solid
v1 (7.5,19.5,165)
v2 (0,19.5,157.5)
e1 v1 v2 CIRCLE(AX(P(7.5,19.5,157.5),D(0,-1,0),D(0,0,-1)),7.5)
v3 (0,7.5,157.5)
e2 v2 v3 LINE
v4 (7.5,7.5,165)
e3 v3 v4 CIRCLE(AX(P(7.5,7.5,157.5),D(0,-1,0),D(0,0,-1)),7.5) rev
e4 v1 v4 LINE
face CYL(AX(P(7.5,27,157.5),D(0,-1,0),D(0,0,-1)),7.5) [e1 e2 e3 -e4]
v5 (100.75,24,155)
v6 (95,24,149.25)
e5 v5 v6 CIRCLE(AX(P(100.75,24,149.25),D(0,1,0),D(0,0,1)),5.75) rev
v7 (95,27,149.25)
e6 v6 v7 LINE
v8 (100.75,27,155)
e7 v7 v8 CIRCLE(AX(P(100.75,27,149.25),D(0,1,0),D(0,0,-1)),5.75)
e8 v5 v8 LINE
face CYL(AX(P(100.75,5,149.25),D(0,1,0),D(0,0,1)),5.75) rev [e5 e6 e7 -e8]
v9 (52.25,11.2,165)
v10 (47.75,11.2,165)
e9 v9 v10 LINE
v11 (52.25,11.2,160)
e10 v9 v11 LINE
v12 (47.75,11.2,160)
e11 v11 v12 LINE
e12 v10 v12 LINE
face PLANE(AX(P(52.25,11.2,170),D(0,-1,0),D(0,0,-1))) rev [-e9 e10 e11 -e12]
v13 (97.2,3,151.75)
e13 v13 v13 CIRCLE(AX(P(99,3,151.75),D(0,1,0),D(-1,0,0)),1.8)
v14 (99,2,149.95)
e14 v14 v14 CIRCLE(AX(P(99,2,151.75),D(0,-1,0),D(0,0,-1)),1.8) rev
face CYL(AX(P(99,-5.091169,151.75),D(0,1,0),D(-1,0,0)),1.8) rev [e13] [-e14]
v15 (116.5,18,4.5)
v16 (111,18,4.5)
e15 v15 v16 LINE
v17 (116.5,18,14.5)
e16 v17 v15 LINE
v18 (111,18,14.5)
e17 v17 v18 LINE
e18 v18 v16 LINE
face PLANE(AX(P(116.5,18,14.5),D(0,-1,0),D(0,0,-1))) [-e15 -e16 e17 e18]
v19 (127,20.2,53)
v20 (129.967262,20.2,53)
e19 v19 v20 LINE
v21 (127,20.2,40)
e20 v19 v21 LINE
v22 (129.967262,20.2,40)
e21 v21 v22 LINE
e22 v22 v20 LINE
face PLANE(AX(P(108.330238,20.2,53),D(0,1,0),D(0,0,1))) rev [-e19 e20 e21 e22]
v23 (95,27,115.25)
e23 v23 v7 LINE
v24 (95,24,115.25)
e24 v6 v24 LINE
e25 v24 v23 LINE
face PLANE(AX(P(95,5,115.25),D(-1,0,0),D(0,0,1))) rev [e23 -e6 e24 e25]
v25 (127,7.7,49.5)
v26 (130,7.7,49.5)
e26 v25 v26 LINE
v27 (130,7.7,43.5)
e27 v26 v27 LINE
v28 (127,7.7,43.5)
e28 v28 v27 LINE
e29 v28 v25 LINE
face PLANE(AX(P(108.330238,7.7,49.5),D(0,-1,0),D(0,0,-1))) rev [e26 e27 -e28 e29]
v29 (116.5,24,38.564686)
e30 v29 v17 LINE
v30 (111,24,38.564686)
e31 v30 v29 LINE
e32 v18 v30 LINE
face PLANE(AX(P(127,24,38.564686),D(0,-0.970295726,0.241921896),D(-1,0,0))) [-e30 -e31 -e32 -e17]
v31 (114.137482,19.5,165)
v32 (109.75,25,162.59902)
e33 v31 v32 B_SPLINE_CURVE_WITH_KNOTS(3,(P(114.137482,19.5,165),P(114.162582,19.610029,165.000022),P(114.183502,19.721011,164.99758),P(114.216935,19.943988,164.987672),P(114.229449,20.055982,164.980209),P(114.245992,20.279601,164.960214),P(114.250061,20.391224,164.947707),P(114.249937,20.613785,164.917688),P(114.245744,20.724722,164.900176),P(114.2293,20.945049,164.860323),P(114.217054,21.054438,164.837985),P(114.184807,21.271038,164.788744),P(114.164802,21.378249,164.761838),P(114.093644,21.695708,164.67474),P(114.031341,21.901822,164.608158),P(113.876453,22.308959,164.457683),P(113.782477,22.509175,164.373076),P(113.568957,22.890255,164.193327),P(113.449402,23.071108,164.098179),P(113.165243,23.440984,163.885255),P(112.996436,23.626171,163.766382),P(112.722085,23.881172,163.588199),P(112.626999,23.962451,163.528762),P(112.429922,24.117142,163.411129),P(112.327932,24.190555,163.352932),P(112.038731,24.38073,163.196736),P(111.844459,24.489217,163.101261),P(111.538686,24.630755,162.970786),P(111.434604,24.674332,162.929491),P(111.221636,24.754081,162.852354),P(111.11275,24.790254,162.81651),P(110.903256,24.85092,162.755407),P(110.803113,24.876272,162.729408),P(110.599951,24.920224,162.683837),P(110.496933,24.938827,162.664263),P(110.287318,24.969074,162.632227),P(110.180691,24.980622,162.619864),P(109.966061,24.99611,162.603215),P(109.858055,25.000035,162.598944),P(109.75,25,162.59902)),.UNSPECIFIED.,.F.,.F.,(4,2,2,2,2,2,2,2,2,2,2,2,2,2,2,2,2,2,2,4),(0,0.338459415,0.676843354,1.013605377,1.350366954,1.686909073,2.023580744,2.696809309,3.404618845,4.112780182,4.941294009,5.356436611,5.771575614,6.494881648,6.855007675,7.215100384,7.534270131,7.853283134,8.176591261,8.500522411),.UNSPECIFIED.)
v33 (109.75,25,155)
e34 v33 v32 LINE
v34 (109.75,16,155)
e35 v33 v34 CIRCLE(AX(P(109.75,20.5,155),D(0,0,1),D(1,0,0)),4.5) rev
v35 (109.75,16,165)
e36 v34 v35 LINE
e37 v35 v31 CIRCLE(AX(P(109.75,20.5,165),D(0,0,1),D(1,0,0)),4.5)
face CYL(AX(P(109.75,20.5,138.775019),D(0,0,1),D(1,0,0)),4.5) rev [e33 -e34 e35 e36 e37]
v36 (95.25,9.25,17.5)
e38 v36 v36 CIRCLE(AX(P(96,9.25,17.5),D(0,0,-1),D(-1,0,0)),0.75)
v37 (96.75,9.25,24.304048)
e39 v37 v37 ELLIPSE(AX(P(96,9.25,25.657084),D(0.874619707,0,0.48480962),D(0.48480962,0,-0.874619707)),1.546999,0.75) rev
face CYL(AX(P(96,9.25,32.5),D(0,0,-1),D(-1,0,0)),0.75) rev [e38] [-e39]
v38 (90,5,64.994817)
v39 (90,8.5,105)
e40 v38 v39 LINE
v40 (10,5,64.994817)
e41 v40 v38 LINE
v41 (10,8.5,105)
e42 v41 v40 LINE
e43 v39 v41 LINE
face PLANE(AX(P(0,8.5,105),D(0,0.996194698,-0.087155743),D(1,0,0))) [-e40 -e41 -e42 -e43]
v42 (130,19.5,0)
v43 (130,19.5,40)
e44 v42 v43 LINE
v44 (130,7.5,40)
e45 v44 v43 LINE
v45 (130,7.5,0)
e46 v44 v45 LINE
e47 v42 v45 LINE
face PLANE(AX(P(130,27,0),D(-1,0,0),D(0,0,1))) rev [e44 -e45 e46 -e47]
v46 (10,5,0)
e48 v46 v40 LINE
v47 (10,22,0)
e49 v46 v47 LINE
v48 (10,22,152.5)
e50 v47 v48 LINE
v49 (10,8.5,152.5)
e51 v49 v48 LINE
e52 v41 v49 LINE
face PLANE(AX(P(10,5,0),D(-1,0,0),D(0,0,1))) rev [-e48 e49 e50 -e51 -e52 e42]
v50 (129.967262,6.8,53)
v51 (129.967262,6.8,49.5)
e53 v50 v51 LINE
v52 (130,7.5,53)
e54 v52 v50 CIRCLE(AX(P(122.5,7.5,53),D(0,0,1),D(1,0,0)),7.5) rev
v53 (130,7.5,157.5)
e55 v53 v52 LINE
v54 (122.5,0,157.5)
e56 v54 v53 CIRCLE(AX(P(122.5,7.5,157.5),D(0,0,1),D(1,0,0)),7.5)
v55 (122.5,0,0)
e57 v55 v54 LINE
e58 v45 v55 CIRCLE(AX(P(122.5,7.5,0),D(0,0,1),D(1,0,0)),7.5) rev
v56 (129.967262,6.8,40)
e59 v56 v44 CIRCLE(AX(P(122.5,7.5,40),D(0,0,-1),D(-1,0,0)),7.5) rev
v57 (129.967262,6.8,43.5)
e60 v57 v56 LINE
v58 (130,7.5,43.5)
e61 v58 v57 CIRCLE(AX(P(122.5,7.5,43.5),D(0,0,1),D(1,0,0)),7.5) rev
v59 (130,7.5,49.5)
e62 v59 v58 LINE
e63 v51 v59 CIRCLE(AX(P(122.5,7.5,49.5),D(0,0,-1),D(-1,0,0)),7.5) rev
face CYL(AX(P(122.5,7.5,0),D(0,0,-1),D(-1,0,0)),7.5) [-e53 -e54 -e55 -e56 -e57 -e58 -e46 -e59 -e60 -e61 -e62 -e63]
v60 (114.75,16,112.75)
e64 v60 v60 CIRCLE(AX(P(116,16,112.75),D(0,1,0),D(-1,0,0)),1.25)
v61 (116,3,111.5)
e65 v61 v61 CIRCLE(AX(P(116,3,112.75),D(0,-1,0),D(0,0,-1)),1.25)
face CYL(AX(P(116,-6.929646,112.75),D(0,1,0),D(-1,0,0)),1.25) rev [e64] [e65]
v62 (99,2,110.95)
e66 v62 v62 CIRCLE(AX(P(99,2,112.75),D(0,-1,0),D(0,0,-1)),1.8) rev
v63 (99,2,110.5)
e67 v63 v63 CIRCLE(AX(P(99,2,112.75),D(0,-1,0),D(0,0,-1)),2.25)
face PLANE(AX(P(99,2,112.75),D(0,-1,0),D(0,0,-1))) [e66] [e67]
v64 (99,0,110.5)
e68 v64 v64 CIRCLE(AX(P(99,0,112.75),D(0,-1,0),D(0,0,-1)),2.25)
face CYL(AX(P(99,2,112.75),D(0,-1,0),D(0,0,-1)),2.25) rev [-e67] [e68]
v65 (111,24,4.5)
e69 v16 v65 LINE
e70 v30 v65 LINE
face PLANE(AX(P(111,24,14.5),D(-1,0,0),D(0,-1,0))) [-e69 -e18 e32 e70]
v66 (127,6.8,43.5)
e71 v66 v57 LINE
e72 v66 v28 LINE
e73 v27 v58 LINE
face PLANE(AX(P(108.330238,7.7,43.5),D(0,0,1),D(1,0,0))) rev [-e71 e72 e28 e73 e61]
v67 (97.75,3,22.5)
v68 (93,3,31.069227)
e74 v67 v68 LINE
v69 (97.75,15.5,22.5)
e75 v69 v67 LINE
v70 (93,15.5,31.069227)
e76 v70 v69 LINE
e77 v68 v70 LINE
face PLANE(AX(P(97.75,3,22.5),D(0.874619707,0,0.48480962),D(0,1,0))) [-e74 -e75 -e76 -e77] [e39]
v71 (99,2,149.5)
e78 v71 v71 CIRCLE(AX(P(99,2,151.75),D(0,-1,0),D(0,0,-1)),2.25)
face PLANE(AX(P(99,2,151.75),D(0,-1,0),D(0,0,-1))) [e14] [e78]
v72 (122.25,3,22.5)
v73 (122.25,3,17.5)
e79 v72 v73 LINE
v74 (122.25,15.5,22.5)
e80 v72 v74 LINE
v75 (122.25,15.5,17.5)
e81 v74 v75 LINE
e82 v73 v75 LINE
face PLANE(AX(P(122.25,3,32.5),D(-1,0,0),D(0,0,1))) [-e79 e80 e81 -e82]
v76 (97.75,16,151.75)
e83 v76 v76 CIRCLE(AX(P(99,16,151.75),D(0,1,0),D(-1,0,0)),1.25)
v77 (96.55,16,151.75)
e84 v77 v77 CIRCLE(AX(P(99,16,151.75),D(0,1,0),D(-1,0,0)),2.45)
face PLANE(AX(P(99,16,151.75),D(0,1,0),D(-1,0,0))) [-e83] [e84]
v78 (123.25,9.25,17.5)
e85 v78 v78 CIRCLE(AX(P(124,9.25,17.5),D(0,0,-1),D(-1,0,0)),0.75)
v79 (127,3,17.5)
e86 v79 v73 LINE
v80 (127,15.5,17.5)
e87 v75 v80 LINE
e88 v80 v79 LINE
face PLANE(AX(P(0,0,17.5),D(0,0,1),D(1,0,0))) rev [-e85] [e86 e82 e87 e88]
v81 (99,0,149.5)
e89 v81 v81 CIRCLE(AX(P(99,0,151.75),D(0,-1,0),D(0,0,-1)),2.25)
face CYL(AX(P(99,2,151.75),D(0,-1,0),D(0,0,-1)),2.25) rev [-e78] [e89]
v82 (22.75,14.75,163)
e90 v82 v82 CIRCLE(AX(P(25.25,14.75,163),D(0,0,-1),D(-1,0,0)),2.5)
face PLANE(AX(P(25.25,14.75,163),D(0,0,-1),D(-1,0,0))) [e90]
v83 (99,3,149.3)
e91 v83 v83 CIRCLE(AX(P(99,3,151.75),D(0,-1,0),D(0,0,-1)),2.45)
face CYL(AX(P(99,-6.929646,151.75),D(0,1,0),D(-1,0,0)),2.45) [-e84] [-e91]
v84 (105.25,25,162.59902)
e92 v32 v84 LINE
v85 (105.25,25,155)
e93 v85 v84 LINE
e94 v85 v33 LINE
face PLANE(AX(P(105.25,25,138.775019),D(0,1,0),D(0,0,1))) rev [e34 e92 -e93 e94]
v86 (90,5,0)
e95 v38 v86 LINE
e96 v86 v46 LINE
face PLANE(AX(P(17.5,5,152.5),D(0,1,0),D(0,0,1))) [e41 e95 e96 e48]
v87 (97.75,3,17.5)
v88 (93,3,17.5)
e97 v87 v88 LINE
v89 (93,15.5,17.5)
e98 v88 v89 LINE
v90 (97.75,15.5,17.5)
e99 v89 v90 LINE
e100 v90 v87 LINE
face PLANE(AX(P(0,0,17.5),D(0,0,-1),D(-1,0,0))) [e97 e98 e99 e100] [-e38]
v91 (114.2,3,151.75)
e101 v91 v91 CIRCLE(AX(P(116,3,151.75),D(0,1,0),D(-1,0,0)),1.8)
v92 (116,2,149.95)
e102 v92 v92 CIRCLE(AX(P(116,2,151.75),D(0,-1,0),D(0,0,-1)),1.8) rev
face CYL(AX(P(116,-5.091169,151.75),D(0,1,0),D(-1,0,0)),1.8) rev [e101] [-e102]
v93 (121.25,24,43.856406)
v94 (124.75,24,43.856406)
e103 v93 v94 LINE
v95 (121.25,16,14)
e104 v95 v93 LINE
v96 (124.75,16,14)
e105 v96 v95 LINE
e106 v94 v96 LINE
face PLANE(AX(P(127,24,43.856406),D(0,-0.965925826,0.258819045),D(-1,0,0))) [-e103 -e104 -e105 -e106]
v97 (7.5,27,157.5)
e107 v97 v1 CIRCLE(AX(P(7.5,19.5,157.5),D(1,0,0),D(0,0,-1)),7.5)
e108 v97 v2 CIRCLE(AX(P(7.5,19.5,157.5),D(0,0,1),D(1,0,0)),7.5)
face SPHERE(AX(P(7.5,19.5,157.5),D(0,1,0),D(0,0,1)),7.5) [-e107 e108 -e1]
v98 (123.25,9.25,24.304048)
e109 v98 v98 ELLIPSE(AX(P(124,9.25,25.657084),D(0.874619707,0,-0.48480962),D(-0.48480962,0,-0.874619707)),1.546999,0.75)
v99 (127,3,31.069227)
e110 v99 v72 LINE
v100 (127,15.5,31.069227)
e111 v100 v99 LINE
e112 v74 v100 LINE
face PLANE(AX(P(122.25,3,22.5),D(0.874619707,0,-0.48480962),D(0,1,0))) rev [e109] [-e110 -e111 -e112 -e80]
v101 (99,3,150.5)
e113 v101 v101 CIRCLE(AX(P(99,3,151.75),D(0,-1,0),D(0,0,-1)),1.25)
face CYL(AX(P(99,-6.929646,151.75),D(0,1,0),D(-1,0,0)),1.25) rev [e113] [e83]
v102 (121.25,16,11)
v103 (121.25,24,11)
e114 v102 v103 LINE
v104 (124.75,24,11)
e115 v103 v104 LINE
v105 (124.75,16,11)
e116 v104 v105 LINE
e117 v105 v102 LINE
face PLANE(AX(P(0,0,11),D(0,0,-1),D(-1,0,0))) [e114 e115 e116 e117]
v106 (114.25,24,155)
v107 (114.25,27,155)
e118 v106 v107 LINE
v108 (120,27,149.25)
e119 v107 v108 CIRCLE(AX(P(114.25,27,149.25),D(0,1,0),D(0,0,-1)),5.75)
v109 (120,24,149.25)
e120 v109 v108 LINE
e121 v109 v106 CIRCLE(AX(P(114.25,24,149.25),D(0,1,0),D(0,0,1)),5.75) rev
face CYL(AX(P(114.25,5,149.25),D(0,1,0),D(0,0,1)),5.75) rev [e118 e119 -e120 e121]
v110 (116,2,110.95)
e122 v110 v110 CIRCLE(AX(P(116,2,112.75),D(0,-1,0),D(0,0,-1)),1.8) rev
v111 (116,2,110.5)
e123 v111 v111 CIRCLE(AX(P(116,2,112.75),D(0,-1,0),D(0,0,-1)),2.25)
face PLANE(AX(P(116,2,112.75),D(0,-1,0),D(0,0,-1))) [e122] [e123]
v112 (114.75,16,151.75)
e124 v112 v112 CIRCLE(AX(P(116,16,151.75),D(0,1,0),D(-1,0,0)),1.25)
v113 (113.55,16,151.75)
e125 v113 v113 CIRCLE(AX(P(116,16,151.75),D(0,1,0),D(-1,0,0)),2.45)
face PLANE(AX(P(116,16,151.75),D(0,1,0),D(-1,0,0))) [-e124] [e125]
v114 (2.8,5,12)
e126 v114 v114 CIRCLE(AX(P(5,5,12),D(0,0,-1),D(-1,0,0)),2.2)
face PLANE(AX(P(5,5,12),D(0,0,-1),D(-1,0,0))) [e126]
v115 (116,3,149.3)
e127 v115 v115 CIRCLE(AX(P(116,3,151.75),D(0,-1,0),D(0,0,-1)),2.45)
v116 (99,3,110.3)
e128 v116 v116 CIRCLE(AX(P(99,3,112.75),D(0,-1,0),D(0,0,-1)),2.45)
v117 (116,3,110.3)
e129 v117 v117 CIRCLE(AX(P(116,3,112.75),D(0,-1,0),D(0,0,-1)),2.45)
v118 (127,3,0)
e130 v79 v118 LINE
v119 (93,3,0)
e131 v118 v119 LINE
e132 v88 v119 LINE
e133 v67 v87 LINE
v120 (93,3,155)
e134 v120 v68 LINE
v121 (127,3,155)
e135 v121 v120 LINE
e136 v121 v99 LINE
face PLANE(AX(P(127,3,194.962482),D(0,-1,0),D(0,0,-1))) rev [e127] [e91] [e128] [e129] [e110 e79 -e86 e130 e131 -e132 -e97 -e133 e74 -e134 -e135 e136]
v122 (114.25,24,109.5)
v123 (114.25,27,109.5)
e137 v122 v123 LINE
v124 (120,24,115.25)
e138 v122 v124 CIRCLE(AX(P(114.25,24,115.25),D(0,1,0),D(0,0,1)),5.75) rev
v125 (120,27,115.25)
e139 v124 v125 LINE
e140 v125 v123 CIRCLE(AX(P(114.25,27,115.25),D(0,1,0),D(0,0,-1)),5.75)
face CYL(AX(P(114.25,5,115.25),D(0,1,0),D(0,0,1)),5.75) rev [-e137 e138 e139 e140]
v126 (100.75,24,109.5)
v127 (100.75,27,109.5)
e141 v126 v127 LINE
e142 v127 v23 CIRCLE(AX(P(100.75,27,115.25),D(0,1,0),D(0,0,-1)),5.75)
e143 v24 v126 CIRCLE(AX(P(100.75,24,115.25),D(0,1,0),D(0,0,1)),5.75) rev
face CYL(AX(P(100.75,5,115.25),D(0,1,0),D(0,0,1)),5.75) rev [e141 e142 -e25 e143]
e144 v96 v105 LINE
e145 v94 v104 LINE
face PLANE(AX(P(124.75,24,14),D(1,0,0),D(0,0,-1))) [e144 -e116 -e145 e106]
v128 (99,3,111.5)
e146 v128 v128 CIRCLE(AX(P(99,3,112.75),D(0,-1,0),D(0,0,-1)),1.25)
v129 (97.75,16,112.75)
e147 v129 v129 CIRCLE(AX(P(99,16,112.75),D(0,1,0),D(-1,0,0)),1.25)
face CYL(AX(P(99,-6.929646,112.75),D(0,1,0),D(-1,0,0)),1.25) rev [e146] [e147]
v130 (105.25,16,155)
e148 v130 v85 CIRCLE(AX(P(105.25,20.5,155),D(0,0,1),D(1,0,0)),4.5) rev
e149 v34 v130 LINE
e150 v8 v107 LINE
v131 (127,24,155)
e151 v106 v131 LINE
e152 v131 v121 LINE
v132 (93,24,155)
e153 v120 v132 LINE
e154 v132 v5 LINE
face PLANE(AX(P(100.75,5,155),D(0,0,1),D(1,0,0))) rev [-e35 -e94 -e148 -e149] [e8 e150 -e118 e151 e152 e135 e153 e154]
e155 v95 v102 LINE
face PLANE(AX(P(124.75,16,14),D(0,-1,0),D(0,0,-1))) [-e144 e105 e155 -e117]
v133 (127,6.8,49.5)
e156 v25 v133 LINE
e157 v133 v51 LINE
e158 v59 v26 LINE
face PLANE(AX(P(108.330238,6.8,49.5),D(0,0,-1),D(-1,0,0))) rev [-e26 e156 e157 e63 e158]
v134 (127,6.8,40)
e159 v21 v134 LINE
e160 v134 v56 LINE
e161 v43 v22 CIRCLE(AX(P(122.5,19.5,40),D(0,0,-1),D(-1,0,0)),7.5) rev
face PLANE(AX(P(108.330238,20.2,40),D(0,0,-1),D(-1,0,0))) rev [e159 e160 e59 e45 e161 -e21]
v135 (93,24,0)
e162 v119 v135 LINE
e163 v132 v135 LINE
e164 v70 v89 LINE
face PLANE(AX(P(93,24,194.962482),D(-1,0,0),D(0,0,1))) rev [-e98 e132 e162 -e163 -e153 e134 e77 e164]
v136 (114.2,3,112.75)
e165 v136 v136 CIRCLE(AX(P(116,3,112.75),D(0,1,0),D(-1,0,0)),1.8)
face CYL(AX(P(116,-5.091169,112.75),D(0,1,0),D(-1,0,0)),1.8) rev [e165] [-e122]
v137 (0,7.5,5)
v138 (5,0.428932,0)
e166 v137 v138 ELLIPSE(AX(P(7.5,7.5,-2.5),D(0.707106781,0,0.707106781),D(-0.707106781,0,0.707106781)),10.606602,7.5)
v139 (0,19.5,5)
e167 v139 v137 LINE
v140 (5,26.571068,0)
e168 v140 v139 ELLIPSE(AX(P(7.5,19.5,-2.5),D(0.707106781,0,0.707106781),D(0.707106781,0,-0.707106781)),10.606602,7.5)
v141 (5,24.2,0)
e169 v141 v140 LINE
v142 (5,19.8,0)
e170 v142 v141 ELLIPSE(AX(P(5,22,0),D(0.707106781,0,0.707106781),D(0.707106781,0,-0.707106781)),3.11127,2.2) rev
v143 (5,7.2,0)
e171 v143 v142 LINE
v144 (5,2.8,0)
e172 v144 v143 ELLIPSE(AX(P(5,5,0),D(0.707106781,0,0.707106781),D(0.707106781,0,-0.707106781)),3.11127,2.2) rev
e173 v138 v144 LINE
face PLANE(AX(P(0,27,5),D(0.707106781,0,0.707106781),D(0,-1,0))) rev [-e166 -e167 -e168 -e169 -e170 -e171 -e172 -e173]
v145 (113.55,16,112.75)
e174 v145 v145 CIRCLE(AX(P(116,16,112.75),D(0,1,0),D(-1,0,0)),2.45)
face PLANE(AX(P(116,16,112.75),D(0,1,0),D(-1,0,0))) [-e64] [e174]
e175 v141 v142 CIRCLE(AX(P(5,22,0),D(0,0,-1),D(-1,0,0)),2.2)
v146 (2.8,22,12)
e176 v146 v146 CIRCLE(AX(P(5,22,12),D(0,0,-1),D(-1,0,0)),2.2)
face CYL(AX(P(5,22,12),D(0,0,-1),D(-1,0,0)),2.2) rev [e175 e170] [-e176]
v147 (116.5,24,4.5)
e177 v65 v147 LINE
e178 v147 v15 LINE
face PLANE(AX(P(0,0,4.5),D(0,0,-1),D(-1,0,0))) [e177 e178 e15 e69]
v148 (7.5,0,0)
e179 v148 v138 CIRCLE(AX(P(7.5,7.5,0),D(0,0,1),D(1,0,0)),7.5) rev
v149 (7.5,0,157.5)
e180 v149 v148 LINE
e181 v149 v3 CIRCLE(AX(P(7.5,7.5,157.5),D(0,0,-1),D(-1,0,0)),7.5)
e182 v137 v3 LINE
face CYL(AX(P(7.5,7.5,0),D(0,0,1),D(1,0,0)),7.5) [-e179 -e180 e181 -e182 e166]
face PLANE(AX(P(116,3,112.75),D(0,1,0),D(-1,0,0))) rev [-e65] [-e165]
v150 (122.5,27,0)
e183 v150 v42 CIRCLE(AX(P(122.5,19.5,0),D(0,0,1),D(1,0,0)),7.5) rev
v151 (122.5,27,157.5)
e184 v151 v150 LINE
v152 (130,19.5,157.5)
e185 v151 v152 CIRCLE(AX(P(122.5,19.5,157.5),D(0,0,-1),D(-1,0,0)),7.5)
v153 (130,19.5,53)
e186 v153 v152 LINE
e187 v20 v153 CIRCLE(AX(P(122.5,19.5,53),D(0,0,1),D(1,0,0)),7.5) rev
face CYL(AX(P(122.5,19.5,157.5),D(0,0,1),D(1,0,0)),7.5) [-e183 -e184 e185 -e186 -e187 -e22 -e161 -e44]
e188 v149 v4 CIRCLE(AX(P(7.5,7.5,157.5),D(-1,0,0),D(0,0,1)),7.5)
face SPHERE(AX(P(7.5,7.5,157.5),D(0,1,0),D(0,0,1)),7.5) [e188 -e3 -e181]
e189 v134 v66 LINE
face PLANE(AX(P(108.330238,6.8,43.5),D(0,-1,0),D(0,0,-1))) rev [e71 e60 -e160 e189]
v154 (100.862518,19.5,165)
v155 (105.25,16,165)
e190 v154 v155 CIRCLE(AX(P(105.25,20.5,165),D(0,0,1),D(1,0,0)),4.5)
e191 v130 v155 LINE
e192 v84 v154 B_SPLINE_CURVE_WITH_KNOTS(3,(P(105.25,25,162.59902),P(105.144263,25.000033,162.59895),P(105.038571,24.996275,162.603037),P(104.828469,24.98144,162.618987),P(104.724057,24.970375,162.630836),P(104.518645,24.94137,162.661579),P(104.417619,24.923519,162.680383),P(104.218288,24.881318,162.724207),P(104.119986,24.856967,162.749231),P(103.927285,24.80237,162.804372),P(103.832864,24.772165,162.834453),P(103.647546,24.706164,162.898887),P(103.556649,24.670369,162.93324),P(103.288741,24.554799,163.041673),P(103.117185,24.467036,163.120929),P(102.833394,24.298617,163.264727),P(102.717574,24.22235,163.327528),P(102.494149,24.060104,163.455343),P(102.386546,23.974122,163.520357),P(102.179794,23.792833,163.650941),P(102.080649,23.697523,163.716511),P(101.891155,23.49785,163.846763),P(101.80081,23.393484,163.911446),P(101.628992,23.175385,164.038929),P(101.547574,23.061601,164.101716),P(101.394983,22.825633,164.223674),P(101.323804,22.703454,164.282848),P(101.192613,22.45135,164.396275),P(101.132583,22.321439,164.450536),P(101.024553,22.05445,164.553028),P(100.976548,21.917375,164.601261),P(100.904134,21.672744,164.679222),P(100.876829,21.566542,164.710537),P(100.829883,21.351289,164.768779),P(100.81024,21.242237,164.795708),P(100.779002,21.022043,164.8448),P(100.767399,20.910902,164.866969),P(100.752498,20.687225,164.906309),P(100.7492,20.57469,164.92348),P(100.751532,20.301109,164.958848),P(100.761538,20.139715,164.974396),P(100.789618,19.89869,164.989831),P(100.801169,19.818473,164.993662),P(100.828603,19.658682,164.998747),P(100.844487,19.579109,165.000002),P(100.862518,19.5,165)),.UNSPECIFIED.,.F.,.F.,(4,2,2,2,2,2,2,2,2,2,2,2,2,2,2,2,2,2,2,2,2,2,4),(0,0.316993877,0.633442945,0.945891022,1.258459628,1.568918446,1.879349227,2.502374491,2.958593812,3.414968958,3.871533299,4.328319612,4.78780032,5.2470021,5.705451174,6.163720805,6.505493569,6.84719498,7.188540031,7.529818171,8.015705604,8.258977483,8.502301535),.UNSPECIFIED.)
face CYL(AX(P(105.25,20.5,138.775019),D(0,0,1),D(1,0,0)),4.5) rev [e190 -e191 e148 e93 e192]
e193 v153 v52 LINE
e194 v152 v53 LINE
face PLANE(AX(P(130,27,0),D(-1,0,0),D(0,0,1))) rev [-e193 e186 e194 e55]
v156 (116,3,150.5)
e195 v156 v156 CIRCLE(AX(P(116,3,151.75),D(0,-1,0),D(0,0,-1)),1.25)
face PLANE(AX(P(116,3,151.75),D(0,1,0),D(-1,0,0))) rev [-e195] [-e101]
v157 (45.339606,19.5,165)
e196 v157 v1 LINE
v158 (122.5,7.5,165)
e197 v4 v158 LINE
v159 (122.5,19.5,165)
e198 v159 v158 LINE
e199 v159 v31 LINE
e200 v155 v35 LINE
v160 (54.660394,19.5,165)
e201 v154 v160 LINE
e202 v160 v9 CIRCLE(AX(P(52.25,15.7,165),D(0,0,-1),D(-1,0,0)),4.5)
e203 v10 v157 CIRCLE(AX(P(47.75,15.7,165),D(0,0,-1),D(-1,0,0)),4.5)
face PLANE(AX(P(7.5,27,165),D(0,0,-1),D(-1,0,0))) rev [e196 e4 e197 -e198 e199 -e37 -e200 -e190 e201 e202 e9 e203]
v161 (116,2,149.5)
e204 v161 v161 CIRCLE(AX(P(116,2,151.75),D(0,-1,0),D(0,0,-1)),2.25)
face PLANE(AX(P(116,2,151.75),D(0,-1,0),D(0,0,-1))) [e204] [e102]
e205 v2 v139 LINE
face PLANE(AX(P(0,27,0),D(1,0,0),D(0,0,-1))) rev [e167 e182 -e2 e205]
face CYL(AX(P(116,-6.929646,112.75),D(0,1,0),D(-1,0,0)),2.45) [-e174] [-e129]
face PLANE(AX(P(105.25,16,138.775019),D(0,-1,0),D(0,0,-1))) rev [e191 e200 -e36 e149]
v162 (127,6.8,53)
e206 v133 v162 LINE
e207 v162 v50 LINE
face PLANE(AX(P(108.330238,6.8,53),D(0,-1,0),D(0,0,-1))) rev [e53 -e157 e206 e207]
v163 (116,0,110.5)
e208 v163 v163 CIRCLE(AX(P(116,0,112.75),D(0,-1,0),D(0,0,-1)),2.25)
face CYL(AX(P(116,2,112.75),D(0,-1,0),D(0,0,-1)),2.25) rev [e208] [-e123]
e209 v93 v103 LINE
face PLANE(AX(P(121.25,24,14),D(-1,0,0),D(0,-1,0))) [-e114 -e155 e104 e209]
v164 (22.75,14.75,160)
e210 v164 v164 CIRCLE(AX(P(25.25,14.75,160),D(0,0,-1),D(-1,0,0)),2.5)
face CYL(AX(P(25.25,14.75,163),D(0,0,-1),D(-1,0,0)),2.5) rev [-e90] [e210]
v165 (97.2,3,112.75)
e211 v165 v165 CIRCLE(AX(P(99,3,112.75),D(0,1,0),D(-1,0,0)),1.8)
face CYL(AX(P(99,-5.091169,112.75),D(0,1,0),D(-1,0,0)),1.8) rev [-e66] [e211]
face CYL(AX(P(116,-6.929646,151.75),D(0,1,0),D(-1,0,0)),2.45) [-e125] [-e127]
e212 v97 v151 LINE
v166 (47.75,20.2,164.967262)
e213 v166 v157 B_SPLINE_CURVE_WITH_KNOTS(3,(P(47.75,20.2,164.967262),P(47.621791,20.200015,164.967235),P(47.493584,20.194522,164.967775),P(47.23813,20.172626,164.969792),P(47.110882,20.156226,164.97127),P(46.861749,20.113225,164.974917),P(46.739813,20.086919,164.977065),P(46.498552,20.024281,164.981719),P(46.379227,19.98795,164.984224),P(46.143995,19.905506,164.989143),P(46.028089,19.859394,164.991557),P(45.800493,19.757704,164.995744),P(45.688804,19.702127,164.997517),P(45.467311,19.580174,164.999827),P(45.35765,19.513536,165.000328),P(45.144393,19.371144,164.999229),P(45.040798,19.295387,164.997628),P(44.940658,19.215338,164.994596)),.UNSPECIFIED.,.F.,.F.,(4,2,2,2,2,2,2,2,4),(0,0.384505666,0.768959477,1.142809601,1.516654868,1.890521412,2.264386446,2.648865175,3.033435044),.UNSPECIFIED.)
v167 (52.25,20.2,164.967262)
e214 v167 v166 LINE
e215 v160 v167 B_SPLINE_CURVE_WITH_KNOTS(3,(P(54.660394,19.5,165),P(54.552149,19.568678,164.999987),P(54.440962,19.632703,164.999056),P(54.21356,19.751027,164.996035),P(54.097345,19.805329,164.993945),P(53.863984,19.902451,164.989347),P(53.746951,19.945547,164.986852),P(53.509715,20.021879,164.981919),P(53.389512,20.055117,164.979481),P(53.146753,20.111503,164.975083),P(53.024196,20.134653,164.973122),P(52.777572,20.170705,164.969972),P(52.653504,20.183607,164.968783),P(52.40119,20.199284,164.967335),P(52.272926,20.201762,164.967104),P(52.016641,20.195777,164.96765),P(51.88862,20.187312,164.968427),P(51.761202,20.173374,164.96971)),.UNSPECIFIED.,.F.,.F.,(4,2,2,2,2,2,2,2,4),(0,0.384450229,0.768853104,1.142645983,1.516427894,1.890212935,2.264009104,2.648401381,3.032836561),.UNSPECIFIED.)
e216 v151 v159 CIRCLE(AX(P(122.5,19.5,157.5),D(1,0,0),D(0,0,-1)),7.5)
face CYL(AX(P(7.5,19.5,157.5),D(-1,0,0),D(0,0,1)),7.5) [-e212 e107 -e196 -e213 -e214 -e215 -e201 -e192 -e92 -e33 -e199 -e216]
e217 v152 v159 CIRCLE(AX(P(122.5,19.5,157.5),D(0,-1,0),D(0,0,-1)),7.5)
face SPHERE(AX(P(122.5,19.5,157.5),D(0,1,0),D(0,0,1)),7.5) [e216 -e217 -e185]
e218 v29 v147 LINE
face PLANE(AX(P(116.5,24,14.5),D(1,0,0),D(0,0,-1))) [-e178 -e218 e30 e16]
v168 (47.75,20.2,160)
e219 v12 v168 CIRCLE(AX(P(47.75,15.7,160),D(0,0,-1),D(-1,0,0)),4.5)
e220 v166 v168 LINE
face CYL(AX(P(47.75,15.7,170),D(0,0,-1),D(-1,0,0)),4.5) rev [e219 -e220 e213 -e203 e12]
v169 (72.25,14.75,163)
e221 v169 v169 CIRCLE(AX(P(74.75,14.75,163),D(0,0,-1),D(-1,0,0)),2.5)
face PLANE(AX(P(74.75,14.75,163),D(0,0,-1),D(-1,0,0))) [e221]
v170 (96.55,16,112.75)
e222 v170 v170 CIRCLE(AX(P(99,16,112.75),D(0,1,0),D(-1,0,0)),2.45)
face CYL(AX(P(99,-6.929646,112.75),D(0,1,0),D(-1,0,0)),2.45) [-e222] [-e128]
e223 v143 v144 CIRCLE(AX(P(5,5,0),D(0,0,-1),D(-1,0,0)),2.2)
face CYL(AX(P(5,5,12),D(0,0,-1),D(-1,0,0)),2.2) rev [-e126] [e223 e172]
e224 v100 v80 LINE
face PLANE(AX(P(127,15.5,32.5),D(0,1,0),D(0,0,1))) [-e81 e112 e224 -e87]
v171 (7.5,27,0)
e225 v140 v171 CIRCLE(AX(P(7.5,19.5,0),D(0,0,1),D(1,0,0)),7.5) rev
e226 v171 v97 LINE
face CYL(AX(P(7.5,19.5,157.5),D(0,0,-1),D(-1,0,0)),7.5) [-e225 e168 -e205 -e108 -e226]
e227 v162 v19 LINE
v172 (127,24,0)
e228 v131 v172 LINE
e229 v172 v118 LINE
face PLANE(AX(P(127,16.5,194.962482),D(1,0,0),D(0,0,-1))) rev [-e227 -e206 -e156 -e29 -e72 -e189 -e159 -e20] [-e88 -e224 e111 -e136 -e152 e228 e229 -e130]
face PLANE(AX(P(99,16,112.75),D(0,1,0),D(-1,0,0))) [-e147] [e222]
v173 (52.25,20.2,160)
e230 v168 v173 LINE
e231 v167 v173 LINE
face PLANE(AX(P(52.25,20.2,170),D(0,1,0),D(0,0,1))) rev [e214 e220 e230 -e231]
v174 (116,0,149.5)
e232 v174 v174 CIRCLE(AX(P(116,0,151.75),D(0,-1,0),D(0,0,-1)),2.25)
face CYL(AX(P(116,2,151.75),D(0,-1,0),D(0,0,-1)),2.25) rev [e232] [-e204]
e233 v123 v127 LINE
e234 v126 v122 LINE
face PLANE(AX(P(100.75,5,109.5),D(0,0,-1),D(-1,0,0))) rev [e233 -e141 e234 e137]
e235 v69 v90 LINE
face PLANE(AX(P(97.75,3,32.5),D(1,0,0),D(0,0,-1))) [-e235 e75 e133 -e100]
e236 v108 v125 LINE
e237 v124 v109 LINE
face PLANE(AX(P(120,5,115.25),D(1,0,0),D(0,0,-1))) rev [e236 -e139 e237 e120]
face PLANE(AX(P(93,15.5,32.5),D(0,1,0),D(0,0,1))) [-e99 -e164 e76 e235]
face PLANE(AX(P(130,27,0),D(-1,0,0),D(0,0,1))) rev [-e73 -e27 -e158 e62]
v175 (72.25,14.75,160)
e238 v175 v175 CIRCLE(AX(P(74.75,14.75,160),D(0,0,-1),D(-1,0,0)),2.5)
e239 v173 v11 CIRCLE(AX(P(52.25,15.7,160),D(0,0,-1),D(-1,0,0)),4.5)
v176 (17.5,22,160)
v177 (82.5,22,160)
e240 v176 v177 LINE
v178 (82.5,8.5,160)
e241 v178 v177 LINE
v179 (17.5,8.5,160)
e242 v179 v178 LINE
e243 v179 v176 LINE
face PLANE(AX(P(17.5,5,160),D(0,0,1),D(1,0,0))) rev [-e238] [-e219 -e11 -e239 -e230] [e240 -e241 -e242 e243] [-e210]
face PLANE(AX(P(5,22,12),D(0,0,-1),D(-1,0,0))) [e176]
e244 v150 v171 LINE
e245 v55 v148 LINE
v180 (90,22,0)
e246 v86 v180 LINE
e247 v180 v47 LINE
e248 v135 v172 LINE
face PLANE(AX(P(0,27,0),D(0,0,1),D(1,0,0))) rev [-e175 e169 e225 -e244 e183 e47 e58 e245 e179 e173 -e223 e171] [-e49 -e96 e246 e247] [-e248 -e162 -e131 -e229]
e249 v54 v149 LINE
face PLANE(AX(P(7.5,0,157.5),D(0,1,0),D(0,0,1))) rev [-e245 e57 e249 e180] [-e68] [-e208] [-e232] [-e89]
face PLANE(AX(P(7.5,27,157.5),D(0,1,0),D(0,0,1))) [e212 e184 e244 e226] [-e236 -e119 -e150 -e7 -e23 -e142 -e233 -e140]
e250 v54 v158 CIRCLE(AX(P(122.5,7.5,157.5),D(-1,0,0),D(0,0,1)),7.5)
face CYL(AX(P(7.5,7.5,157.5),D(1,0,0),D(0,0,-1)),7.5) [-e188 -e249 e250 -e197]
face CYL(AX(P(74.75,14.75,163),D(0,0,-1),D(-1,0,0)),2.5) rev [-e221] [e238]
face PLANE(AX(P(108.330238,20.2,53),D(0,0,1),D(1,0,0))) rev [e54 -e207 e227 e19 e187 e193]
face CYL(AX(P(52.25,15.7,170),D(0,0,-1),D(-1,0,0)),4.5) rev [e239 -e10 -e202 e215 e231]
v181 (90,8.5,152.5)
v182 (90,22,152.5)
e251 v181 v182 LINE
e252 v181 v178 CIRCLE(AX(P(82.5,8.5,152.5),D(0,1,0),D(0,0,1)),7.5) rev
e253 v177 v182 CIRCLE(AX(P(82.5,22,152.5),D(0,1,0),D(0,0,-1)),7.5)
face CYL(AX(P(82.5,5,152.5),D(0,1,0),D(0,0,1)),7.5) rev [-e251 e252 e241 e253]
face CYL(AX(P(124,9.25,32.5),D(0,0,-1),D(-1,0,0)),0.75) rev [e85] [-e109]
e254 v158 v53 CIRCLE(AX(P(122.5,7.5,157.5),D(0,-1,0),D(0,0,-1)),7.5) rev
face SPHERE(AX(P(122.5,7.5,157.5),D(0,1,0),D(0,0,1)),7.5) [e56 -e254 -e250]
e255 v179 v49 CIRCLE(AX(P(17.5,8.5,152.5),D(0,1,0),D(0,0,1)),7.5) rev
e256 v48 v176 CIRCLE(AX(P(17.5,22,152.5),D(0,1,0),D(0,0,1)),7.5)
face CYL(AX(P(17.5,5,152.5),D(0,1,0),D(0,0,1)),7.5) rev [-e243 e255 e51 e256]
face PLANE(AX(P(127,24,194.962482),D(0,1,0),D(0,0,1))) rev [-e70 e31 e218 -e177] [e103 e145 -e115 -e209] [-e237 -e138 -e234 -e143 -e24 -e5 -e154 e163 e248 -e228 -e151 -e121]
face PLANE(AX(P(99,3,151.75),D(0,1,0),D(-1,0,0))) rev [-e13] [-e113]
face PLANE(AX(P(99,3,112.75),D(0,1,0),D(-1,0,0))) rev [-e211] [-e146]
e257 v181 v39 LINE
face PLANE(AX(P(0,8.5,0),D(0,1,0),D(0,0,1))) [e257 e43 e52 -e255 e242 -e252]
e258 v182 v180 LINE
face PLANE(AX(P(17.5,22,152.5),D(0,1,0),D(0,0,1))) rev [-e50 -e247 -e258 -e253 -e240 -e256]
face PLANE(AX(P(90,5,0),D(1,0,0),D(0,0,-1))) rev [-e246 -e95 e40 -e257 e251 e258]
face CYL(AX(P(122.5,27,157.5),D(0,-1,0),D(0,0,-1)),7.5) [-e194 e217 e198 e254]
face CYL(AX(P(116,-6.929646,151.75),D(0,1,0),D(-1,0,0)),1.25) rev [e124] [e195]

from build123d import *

# Parameters (mm, degrees)
BOSS_EXTRUDE1_DEPTH      = 27
CUT_EXTRUDE1_START       = -5
CUT_EXTRUDE1_DEPTH       = 17
CUT_EXTRUDE2_DEPTH       = 10
FILLET2_R                = 7.5
FILLET3_R                = 7.5
SKETCH4_W                = 80
SKETCH4_H                = 100
BOSS_EXTRUDE2_DEPTH      = 3.5
CHAMFER6_SIZE            = 5
SKETCH6_R                = 2.2
CUT_EXTRUDE3_DEPTH       = 12
CUT_EXTRUDE4_DEPTH       = 22
CUT_EXTRUDE5_REACH       = 213.788
BOSS_EXTRUDE4_DEPTH      = 13
BOSS_EXTRUDE4_DEPTH_BACK = 3
SKETCH12_R               = 2.45
SKETCH12_R_2             = 1.25
SKETCH14_R               = 1.8
CUT_EXTRUDE6_DEPTH       = 3
SKETCH15_R               = 2.25
CUT_EXTRUDE7_DEPTH       = 2
CHAMFER7_SIZE            = 3.936989859
CHAMFER7_SIZE_2          = 45
CUT_EXTRUDE8_DEPTH       = 10
BOSS_EXTRUDE5_START      = -17.5
SKETCH18_W               = 4.75
SKETCH18_H               = 12.5
SKETCH18_R               = 0.75
BOSS_EXTRUDE5_DEPTH      = 15
BOSS_EXTRUDE6_START      = -11
SKETCH19_W               = 3.5
SKETCH19_H               = 8
BOSS_EXTRUDE6_DEPTH      = 3
CHAMFER9_SIZE2           = 8
CHAMFER9_SIZE            = 29.856406461
CHAMFER8_SIZE            = 5.543090515
CHAMFER8_SIZE_2          = 10
BOSS_EXTRUDE7_START      = -4.5
SKETCH20_W               = 5.5
SKETCH20_H               = 6
BOSS_EXTRUDE7_DEPTH      = 10
CHAMFER11_SIZE2          = 6
CHAMFER11_SIZE           = 24.064685601
CUT_EXTRUDE9_DEPTH       = 3
SKETCH22_R               = 2.5
CUT_EXTRUDE10_DEPTH      = 3


# Some blends are built 0.0001 mm under size
with BuildPart() as part:
    # Sketch1 → Boss-Extrude1 (new body)
    with BuildSketch(Plane(origin=(0, 0, 0), x_dir=(1, 0, 0), z_dir=(0, 1, 0))):
        with BuildLine():
            Line((0, 0), (130, 0))
            Line((130, 0), (130, -157.5))
            ThreePointArc((130, -157.5), (127.803300859, -162.803300859), (122.5, -165))
            Line((122.5, -165), (7.5, -165))
            ThreePointArc((7.5, -165), (2.196699141, -162.803300859), (0, -157.5))
            Line((0, -157.5), (0, 0))
        make_face()
    extrude(amount=BOSS_EXTRUDE1_DEPTH)

    # Sketch2 → Cut-Extrude1 (cut)
    with BuildSketch(Plane(origin=(0, 27, 0), x_dir=(1, 0, 0), z_dir=(0, 1, 0)).offset(CUT_EXTRUDE1_START)):
        with BuildLine():
            Line((10, 0), (90, 0))
            Line((90, 0), (90, -152.5))
            ThreePointArc((90, -152.5), (87.803300859, -157.803300859), (82.5, -160))
            Line((82.5, -160), (17.5, -160))
            ThreePointArc((17.5, -160), (12.196699141, -157.803300859), (10, -152.5))
            Line((10, -152.5), (10, 0))
        make_face()
    extrude(amount=-CUT_EXTRUDE1_DEPTH, mode=Mode.SUBTRACT)

    # Sketch3 → Cut-Extrude2 (cut)
    with BuildSketch(Plane(origin=(0, 0, 160), x_dir=(-1, 0, 0), z_dir=(0, 0, -1))):
        with BuildLine():
            Line((-52.25, 20.2), (-47.75, 20.2))
            ThreePointArc((-47.75, 20.2), (-43.25, 15.7), (-47.75, 11.2))
            Line((-47.75, 11.2), (-52.25, 11.2))
            ThreePointArc((-52.25, 11.2), (-56.75, 15.7), (-52.25, 20.2))
        make_face()
    extrude(amount=-CUT_EXTRUDE2_DEPTH, mode=Mode.SUBTRACT)

    # Fillet2
    fillet2_edges = [part.edges().sort_by_distance(p)[0] for p in [
        (130, 0, 78.75),
        (127.803300859, 0, 162.803300859),
        (65, 0, 165),
        (2.196699141, 0, 162.803300859),
        (0, 0, 78.75),
    ]]
    fillet(fillet2_edges, radius=FILLET2_R)

    # Fillet3
    # the kernel refuses this fillet: 7.5 mm, written as the material it takes off along each edge
    with BuildSketch(Plane(origin=(122.5, 27, 165), x_dir=(0, 0, -1), z_dir=(-1, 0, 0))) as fillet3_piece_1:
        with BuildLine():
            CenterArc((FILLET3_R, FILLET3_R), FILLET3_R, 180, 90)
            Line((0, FILLET3_R), (0, 0))
            Line((0, 0), (FILLET3_R, 0))
        make_face()
    extrude(amount=115, mode=Mode.SUBTRACT)
    with BuildSketch(Plane(origin=(130, 27, -18.75), x_dir=(-1, 0, 0), z_dir=(0, 0, 1))) as fillet3_piece_2:
        with BuildLine():
            CenterArc((FILLET3_R, FILLET3_R), FILLET3_R, 180, 90)
            Line((0, FILLET3_R), (0, 0))
            Line((0, 0), (FILLET3_R, 0))
        make_face()
    extrude(amount=176.25, mode=Mode.SUBTRACT)
    with BuildSketch(Plane(origin=(0, 27, 157.5), x_dir=(0, -1, 0), z_dir=(0, 0, -1))) as fillet3_piece_3:
        with BuildLine():
            CenterArc((FILLET3_R, -FILLET3_R), FILLET3_R, 90, 90)
            Line((0, -FILLET3_R), (0, 0))
            Line((0, 0), (FILLET3_R, 0))
        make_face()
    extrude(amount=176.25, mode=Mode.SUBTRACT)
    with BuildSketch(Plane(origin=(122.5, 27, 157.5), x_dir=(1, 0, 0), z_dir=(0, 0, -1))) as fillet3_piece_4:
        with BuildLine():
            CenterArc((7.5 - FILLET3_R, FILLET3_R), FILLET3_R, 270, 90)
            Line((7.5, FILLET3_R), (7.5, 0))
            Line((7.5, 0), (7.5 - FILLET3_R, 0))
        make_face()
    revolve(axis=Axis((122.5, 27, 157.5), (0, -1, 0)), revolution_arc=90, mode=Mode.SUBTRACT)
    with BuildSketch(Plane(origin=(7.5, 27, 157.5), x_dir=(0, 0, 1), z_dir=(1, 0, 0))) as fillet3_piece_5:
        with BuildLine():
            CenterArc((7.5 - FILLET3_R, FILLET3_R), FILLET3_R, 270, 90)
            Line((7.5 - FILLET3_R, 0), (7.5, 0))
            Line((7.5, 0), (7.5, FILLET3_R))
        make_face()
    revolve(axis=Axis((7.5, 27, 157.5), (0, -1, 0)), revolution_arc=90, mode=Mode.SUBTRACT)

    # Sketch4 → Boss-Extrude2 (add)
    with BuildSketch(Plane(origin=(0, 5, 0), x_dir=(1, 0, 0), z_dir=(0, 1, 0))):
        with Locations((50, -110)):
            Rectangle(SKETCH4_W, SKETCH4_H)
    extrude(amount=BOSS_EXTRUDE2_DEPTH)

    # Chamfer6
    # the kernel refuses this chamfer: 5 mm, written as the material it takes off along each edge
    with BuildSketch(Plane(origin=(0, -5.35841494, 0), x_dir=(-0.027495876610586254, 0, 0.9996219169112968), z_dir=(0, 1, 0))) as chamfer6_piece_1:
        Polygon((CHAMFER6_SIZE * 0.999621916911, CHAMFER6_SIZE * 0.0274958766106), (-CHAMFER6_SIZE * 0.0274958766106, CHAMFER6_SIZE * 0.999621916911), (0, 0), align=None)
    extrude(amount=37.71682988, mode=Mode.SUBTRACT)

    # Sketch6 → Cut-Extrude3 (cut)
    with BuildSketch(Plane(origin=(0, 0, 0), x_dir=(-1, 0, 0), z_dir=(0, 0, -1))):
        with Locations((-5, 22)):
            Circle(SKETCH6_R)
        with Locations((-5, 5)):
            Circle(SKETCH6_R)
    extrude(amount=-CUT_EXTRUDE3_DEPTH, mode=Mode.SUBTRACT)

    # Sketch9 → Cut-Extrude4 (cut)
    with BuildSketch(Plane(origin=(0, 27, 0), x_dir=(1, 0, 0), z_dir=(0, 1, 0))):
        with BuildLine():
            Line((100.75, -109.5), (114.25, -109.5))
            ThreePointArc((114.25, -109.5), (118.315863992, -111.184136008), (120, -115.25))
            Line((120, -115.25), (120, -149.25))
            ThreePointArc((120, -149.25), (118.315863992, -153.315863992), (114.25, -155))
            Line((114.25, -155), (100.75, -155))
            ThreePointArc((100.75, -155), (96.684136008, -153.315863992), (95, -149.25))
            Line((95, -149.25), (95, -115.25))
            ThreePointArc((95, -115.25), (96.684136008, -111.184136008), (100.75, -109.5))
        make_face()
    extrude(amount=-CUT_EXTRUDE4_DEPTH, mode=Mode.SUBTRACT)

    # Cut-Extrude5: up to this face of the body (flat: up to its plane)
    cut_extrude5_end = Plane(part.part.faces().sort_by_distance((107.5, 16, 155))[0])
    # Sketch11 → Cut-Extrude5 (cut, up to the picked face)
    with BuildSketch(Plane(origin=(0, 0, 0), x_dir=(-1, 0, 0), z_dir=(0, 0, -1)), mode=Mode.PRIVATE) as cut_extrude5_sk1:
        Polygon((-127, 16.5), (-127, 3), (-93, 3), (-93, 24), (-127, 24), align=None)
    cut_extrude5_tool1 = split(extrude(cut_extrude5_sk1.sketch, amount=-CUT_EXTRUDE5_REACH, mode=Mode.PRIVATE), bisect_by=cut_extrude5_end, keep=Keep.BOTH, mode=Mode.PRIVATE)
    add(cut_extrude5_tool1.solids().sort_by(Axis((110, 13.5, 0), (0, 0, 1)))[0], mode=Mode.SUBTRACT)

    # Sketch12 → Boss-Extrude4 (add, two sides: drawn at the far end of the back side and taken through both)
    # profile 1 of 4: a face of its own
    with BuildSketch(Plane(origin=(0, 3, 0), x_dir=(1, 0, 0), z_dir=(0, 1, 0)).offset(-BOSS_EXTRUDE4_DEPTH_BACK)):
        with Locations(Location((99, -112.75, 0), (0, 0, 180))):
            Circle(SKETCH12_R)
        with Locations(Location((99, -112.75, 0), (0, 0, 180))):
            Circle(SKETCH12_R_2, mode=Mode.SUBTRACT)
    # profile 2 of 4: a face of its own
    with BuildSketch(Plane(origin=(0, 3, 0), x_dir=(1, 0, 0), z_dir=(0, 1, 0)).offset(-BOSS_EXTRUDE4_DEPTH_BACK)):
        with Locations(Location((116, -112.75, 0), (0, 0, 180))):
            Circle(SKETCH12_R)
        with Locations(Location((116, -112.75, 0), (0, 0, 180))):
            Circle(SKETCH12_R_2, mode=Mode.SUBTRACT)
    # profile 3 of 4: a face of its own
    with BuildSketch(Plane(origin=(0, 3, 0), x_dir=(1, 0, 0), z_dir=(0, 1, 0)).offset(-BOSS_EXTRUDE4_DEPTH_BACK)):
        with Locations(Location((99, -151.75, 0), (0, 0, 180))):
            Circle(SKETCH12_R)
        with Locations(Location((99, -151.75, 0), (0, 0, 180))):
            Circle(SKETCH12_R_2, mode=Mode.SUBTRACT)
    # profile 4 of 4: a face of its own
    with BuildSketch(Plane(origin=(0, 3, 0), x_dir=(1, 0, 0), z_dir=(0, 1, 0)).offset(-BOSS_EXTRUDE4_DEPTH_BACK)):
        with Locations(Location((116, -151.75, 0), (0, 0, 180))):
            Circle(SKETCH12_R)
        with Locations(Location((116, -151.75, 0), (0, 0, 180))):
            Circle(SKETCH12_R_2, mode=Mode.SUBTRACT)
    extrude(amount=BOSS_EXTRUDE4_DEPTH + BOSS_EXTRUDE4_DEPTH_BACK)

    # Sketch14 → Cut-Extrude6 (cut)
    with BuildSketch(Plane(origin=(0, 3, 0), x_dir=(1, 0, 0), z_dir=(0, 1, 0))):
        with Locations(Location((99, -112.75, 0), (0, 0, 180))):
            Circle(SKETCH14_R)
        with Locations(Location((116, -112.75, 0), (0, 0, 180))):
            Circle(SKETCH14_R)
        with Locations(Location((99, -151.75, 0), (0, 0, 180))):
            Circle(SKETCH14_R)
        with Locations(Location((116, -151.75, 0), (0, 0, 180))):
            Circle(SKETCH14_R)
    extrude(amount=-CUT_EXTRUDE6_DEPTH, mode=Mode.SUBTRACT)

    # Sketch15 → Cut-Extrude7 (cut)
    with BuildSketch(Plane.XZ):
        with Locations(Location((99, 151.75, 0), (0, 0, 270))):
            Circle(SKETCH15_R)
        with Locations(Location((116, 151.75, 0), (0, 0, 270))):
            Circle(SKETCH15_R)
        with Locations(Location((116, 112.75, 0), (0, 0, 270))):
            Circle(SKETCH15_R)
        with Locations(Location((99, 112.75, 0), (0, 0, 270))):
            Circle(SKETCH15_R)
    extrude(amount=-CUT_EXTRUDE7_DEPTH, mode=Mode.SUBTRACT)

    # Chamfer7
    # the kernel refuses this chamfer: 45, 3.936989859 mm, written as the material it takes off along each edge
    with BuildSketch(Plane(origin=(10, 8.5, 60), x_dir=(0, -0.9159861691531135, -0.4012098427509022), z_dir=(1, 0, 0))) as chamfer7_piece_1_section:
        Polygon((CHAMFER7_SIZE * 0.915986169076, -CHAMFER7_SIZE * 0.401209842717), (-CHAMFER7_SIZE_2 * 0.401209842751, -CHAMFER7_SIZE_2 * 0.915986169153), (0, 0), align=None)
    chamfer7_piece_1 = extrude(amount=80, mode=Mode.PRIVATE)
    chamfer7_piece_1 = split(chamfer7_piece_1, bisect_by=Plane(origin=(12.470912859, 5, 75.231072339), z_dir=(0, 1, 0)), keep=Keep.TOP, mode=Mode.PRIVATE)
    add(chamfer7_piece_1, mode=Mode.SUBTRACT)

    # Sketch16 → Cut-Extrude8 (cut)
    with BuildSketch(Plane.XY.offset(165)):
        with BuildLine():
            Line((105.25, 25), (109.75, 25))
            ThreePointArc((109.75, 25), (114.25, 20.5), (109.75, 16))
            Line((109.75, 16), (105.25, 16))
            ThreePointArc((105.25, 16), (100.75, 20.5), (105.25, 25))
        make_face()
    extrude(amount=-CUT_EXTRUDE8_DEPTH, mode=Mode.SUBTRACT)

    # Sketch18 → Boss-Extrude5 (add)
    # profile 1 of 2: a face of its own
    with BuildSketch(Plane(origin=(0, 0, 0), x_dir=(-1, 0, 0), z_dir=(0, 0, -1)).offset(BOSS_EXTRUDE5_START)):
        with Locations((-124.625, 9.25)):
            Rectangle(SKETCH18_W, SKETCH18_H)
        with Locations((-124, 9.25)):
            Circle(SKETCH18_R, mode=Mode.SUBTRACT)
    # profile 2 of 2: a face of its own
    with BuildSketch(Plane(origin=(0, 0, 0), x_dir=(-1, 0, 0), z_dir=(0, 0, -1)).offset(BOSS_EXTRUDE5_START)):
        with Locations((-95.375, 9.25)):
            Rectangle(SKETCH18_W, SKETCH18_H)
        with Locations((-96, 9.25)):
            Circle(SKETCH18_R, mode=Mode.SUBTRACT)
    extrude(amount=-BOSS_EXTRUDE5_DEPTH)

    # Sketch19 → Boss-Extrude6 (add)
    with BuildSketch(Plane(origin=(0, 0, 0), x_dir=(-1, 0, 0), z_dir=(0, 0, -1)).offset(BOSS_EXTRUDE6_START)):
        with Locations((-123, 20)):
            Rectangle(SKETCH19_W, SKETCH19_H)
    extrude(amount=-BOSS_EXTRUDE6_DEPTH)

    # Chamfer9
    chamfer9_edges = [part.edges().sort_by_distance(p)[0] for p in [
        (123, 24, 14),
    ]]
    chamfer9_side = [part.faces().sort_by_distance(p)[0] for p in [
        (123, 24, 14.16),
    ]]
    chamfer(chamfer9_edges, length=CHAMFER9_SIZE - 0.0001, length2=CHAMFER9_SIZE2 - 0.0001, reference=chamfer9_side[0])  # a hair under: the kernel refuses the full size

    # Chamfer8
    # the kernel refuses this chamfer: 10, 5.543090515 mm, written as the material it takes off along each edge
    with BuildSketch(Plane(origin=(97.75, 3, 32.5), x_dir=(-0.9981458389905736, 0, 0.060867759165288256), z_dir=(0, 1, 0))) as chamfer8_piece_1_section:
        Polygon((CHAMFER8_SIZE * 0.998145838906, -CHAMFER8_SIZE * 0.0608677591601), (-CHAMFER8_SIZE_2 * 0.0608677591653, -CHAMFER8_SIZE_2 * 0.998145838991), (0, 0), align=None)
    chamfer8_piece_1 = extrude(amount=12.5, mode=Mode.PRIVATE)
    chamfer8_piece_1 = split(chamfer8_piece_1, bisect_by=Plane(origin=(93, 13.416666667, 29.674431734), z_dir=(1, 0, 0)), keep=Keep.TOP, mode=Mode.PRIVATE)
    add(chamfer8_piece_1, mode=Mode.SUBTRACT)
    with BuildSketch(Plane(origin=(122.25, 3, 32.5), x_dir=(0.9981458389905736, 0, 0.060867759165288256), z_dir=(0, 1, 0))) as chamfer8_piece_2_section:
        Polygon((CHAMFER8_SIZE * 0.998145838906, CHAMFER8_SIZE * 0.0608677591601), (-CHAMFER8_SIZE_2 * 0.0608677591653, CHAMFER8_SIZE_2 * 0.998145838991), (0, 0), align=None)
    chamfer8_piece_2 = extrude(amount=38.379161218, mode=Mode.PRIVATE)
    chamfer8_piece_2 = split(chamfer8_piece_2, bisect_by=Plane(origin=(127, 7.869740247, 30.588424754), z_dir=(-1, 0, 0)), keep=Keep.TOP, mode=Mode.PRIVATE)
    chamfer8_piece_2 = split(chamfer8_piece_2, bisect_by=Plane(origin=(125.673883592, 19.602551791, 27.444656144), z_dir=(0, -0.9659264183795192, 0.2588168353807653)), keep=Keep.TOP, mode=Mode.PRIVATE)
    add(chamfer8_piece_2, mode=Mode.SUBTRACT)

    # Sketch20 → Boss-Extrude7 (add)
    with BuildSketch(Plane(origin=(0, 0, 0), x_dir=(-1, 0, 0), z_dir=(0, 0, -1)).offset(BOSS_EXTRUDE7_START)):
        with Locations((-113.75, 21)):
            Rectangle(SKETCH20_W, SKETCH20_H)
    extrude(amount=-BOSS_EXTRUDE7_DEPTH)

    # Chamfer11
    chamfer11_edges = [part.edges().sort_by_distance(p)[0] for p in [
        (113.75, 24, 14.5),
    ]]
    chamfer11_side = [part.faces().sort_by_distance(p)[0] for p in [
        (113.75, 24, 14.62),
    ]]
    chamfer(chamfer11_edges, length=CHAMFER11_SIZE - 0.0001, length2=CHAMFER11_SIZE2 - 0.0001, reference=chamfer11_side[0])  # a hair under: the kernel refuses the full size

    # Sketch21 → Cut-Extrude9 (cut)
    with BuildSketch(Plane(origin=(130, 0, 0), x_dir=(0, 0, -1), z_dir=(1, 0, 0))):
        Polygon((-49.5, 6.8), (-49.5, 7.7), (-43.5, 7.7), (-43.5, 6.8), (-40, 6.8), (-40, 20.2), (-53, 20.2), (-53, 6.8), align=None)
    extrude(amount=-CUT_EXTRUDE9_DEPTH, mode=Mode.SUBTRACT)

    # Sketch22 → Cut-Extrude10 (cut)
    with BuildSketch(Plane(origin=(0, 0, 160), x_dir=(-1, 0, 0), z_dir=(0, 0, -1))):
        with Locations((-74.75, 14.75)):
            Circle(SKETCH22_R)
        with Locations((-25.25, 14.75)):
            Circle(SKETCH22_R)
    extrude(amount=-CUT_EXTRUDE10_DEPTH, mode=Mode.SUBTRACT)


solid = part.part
